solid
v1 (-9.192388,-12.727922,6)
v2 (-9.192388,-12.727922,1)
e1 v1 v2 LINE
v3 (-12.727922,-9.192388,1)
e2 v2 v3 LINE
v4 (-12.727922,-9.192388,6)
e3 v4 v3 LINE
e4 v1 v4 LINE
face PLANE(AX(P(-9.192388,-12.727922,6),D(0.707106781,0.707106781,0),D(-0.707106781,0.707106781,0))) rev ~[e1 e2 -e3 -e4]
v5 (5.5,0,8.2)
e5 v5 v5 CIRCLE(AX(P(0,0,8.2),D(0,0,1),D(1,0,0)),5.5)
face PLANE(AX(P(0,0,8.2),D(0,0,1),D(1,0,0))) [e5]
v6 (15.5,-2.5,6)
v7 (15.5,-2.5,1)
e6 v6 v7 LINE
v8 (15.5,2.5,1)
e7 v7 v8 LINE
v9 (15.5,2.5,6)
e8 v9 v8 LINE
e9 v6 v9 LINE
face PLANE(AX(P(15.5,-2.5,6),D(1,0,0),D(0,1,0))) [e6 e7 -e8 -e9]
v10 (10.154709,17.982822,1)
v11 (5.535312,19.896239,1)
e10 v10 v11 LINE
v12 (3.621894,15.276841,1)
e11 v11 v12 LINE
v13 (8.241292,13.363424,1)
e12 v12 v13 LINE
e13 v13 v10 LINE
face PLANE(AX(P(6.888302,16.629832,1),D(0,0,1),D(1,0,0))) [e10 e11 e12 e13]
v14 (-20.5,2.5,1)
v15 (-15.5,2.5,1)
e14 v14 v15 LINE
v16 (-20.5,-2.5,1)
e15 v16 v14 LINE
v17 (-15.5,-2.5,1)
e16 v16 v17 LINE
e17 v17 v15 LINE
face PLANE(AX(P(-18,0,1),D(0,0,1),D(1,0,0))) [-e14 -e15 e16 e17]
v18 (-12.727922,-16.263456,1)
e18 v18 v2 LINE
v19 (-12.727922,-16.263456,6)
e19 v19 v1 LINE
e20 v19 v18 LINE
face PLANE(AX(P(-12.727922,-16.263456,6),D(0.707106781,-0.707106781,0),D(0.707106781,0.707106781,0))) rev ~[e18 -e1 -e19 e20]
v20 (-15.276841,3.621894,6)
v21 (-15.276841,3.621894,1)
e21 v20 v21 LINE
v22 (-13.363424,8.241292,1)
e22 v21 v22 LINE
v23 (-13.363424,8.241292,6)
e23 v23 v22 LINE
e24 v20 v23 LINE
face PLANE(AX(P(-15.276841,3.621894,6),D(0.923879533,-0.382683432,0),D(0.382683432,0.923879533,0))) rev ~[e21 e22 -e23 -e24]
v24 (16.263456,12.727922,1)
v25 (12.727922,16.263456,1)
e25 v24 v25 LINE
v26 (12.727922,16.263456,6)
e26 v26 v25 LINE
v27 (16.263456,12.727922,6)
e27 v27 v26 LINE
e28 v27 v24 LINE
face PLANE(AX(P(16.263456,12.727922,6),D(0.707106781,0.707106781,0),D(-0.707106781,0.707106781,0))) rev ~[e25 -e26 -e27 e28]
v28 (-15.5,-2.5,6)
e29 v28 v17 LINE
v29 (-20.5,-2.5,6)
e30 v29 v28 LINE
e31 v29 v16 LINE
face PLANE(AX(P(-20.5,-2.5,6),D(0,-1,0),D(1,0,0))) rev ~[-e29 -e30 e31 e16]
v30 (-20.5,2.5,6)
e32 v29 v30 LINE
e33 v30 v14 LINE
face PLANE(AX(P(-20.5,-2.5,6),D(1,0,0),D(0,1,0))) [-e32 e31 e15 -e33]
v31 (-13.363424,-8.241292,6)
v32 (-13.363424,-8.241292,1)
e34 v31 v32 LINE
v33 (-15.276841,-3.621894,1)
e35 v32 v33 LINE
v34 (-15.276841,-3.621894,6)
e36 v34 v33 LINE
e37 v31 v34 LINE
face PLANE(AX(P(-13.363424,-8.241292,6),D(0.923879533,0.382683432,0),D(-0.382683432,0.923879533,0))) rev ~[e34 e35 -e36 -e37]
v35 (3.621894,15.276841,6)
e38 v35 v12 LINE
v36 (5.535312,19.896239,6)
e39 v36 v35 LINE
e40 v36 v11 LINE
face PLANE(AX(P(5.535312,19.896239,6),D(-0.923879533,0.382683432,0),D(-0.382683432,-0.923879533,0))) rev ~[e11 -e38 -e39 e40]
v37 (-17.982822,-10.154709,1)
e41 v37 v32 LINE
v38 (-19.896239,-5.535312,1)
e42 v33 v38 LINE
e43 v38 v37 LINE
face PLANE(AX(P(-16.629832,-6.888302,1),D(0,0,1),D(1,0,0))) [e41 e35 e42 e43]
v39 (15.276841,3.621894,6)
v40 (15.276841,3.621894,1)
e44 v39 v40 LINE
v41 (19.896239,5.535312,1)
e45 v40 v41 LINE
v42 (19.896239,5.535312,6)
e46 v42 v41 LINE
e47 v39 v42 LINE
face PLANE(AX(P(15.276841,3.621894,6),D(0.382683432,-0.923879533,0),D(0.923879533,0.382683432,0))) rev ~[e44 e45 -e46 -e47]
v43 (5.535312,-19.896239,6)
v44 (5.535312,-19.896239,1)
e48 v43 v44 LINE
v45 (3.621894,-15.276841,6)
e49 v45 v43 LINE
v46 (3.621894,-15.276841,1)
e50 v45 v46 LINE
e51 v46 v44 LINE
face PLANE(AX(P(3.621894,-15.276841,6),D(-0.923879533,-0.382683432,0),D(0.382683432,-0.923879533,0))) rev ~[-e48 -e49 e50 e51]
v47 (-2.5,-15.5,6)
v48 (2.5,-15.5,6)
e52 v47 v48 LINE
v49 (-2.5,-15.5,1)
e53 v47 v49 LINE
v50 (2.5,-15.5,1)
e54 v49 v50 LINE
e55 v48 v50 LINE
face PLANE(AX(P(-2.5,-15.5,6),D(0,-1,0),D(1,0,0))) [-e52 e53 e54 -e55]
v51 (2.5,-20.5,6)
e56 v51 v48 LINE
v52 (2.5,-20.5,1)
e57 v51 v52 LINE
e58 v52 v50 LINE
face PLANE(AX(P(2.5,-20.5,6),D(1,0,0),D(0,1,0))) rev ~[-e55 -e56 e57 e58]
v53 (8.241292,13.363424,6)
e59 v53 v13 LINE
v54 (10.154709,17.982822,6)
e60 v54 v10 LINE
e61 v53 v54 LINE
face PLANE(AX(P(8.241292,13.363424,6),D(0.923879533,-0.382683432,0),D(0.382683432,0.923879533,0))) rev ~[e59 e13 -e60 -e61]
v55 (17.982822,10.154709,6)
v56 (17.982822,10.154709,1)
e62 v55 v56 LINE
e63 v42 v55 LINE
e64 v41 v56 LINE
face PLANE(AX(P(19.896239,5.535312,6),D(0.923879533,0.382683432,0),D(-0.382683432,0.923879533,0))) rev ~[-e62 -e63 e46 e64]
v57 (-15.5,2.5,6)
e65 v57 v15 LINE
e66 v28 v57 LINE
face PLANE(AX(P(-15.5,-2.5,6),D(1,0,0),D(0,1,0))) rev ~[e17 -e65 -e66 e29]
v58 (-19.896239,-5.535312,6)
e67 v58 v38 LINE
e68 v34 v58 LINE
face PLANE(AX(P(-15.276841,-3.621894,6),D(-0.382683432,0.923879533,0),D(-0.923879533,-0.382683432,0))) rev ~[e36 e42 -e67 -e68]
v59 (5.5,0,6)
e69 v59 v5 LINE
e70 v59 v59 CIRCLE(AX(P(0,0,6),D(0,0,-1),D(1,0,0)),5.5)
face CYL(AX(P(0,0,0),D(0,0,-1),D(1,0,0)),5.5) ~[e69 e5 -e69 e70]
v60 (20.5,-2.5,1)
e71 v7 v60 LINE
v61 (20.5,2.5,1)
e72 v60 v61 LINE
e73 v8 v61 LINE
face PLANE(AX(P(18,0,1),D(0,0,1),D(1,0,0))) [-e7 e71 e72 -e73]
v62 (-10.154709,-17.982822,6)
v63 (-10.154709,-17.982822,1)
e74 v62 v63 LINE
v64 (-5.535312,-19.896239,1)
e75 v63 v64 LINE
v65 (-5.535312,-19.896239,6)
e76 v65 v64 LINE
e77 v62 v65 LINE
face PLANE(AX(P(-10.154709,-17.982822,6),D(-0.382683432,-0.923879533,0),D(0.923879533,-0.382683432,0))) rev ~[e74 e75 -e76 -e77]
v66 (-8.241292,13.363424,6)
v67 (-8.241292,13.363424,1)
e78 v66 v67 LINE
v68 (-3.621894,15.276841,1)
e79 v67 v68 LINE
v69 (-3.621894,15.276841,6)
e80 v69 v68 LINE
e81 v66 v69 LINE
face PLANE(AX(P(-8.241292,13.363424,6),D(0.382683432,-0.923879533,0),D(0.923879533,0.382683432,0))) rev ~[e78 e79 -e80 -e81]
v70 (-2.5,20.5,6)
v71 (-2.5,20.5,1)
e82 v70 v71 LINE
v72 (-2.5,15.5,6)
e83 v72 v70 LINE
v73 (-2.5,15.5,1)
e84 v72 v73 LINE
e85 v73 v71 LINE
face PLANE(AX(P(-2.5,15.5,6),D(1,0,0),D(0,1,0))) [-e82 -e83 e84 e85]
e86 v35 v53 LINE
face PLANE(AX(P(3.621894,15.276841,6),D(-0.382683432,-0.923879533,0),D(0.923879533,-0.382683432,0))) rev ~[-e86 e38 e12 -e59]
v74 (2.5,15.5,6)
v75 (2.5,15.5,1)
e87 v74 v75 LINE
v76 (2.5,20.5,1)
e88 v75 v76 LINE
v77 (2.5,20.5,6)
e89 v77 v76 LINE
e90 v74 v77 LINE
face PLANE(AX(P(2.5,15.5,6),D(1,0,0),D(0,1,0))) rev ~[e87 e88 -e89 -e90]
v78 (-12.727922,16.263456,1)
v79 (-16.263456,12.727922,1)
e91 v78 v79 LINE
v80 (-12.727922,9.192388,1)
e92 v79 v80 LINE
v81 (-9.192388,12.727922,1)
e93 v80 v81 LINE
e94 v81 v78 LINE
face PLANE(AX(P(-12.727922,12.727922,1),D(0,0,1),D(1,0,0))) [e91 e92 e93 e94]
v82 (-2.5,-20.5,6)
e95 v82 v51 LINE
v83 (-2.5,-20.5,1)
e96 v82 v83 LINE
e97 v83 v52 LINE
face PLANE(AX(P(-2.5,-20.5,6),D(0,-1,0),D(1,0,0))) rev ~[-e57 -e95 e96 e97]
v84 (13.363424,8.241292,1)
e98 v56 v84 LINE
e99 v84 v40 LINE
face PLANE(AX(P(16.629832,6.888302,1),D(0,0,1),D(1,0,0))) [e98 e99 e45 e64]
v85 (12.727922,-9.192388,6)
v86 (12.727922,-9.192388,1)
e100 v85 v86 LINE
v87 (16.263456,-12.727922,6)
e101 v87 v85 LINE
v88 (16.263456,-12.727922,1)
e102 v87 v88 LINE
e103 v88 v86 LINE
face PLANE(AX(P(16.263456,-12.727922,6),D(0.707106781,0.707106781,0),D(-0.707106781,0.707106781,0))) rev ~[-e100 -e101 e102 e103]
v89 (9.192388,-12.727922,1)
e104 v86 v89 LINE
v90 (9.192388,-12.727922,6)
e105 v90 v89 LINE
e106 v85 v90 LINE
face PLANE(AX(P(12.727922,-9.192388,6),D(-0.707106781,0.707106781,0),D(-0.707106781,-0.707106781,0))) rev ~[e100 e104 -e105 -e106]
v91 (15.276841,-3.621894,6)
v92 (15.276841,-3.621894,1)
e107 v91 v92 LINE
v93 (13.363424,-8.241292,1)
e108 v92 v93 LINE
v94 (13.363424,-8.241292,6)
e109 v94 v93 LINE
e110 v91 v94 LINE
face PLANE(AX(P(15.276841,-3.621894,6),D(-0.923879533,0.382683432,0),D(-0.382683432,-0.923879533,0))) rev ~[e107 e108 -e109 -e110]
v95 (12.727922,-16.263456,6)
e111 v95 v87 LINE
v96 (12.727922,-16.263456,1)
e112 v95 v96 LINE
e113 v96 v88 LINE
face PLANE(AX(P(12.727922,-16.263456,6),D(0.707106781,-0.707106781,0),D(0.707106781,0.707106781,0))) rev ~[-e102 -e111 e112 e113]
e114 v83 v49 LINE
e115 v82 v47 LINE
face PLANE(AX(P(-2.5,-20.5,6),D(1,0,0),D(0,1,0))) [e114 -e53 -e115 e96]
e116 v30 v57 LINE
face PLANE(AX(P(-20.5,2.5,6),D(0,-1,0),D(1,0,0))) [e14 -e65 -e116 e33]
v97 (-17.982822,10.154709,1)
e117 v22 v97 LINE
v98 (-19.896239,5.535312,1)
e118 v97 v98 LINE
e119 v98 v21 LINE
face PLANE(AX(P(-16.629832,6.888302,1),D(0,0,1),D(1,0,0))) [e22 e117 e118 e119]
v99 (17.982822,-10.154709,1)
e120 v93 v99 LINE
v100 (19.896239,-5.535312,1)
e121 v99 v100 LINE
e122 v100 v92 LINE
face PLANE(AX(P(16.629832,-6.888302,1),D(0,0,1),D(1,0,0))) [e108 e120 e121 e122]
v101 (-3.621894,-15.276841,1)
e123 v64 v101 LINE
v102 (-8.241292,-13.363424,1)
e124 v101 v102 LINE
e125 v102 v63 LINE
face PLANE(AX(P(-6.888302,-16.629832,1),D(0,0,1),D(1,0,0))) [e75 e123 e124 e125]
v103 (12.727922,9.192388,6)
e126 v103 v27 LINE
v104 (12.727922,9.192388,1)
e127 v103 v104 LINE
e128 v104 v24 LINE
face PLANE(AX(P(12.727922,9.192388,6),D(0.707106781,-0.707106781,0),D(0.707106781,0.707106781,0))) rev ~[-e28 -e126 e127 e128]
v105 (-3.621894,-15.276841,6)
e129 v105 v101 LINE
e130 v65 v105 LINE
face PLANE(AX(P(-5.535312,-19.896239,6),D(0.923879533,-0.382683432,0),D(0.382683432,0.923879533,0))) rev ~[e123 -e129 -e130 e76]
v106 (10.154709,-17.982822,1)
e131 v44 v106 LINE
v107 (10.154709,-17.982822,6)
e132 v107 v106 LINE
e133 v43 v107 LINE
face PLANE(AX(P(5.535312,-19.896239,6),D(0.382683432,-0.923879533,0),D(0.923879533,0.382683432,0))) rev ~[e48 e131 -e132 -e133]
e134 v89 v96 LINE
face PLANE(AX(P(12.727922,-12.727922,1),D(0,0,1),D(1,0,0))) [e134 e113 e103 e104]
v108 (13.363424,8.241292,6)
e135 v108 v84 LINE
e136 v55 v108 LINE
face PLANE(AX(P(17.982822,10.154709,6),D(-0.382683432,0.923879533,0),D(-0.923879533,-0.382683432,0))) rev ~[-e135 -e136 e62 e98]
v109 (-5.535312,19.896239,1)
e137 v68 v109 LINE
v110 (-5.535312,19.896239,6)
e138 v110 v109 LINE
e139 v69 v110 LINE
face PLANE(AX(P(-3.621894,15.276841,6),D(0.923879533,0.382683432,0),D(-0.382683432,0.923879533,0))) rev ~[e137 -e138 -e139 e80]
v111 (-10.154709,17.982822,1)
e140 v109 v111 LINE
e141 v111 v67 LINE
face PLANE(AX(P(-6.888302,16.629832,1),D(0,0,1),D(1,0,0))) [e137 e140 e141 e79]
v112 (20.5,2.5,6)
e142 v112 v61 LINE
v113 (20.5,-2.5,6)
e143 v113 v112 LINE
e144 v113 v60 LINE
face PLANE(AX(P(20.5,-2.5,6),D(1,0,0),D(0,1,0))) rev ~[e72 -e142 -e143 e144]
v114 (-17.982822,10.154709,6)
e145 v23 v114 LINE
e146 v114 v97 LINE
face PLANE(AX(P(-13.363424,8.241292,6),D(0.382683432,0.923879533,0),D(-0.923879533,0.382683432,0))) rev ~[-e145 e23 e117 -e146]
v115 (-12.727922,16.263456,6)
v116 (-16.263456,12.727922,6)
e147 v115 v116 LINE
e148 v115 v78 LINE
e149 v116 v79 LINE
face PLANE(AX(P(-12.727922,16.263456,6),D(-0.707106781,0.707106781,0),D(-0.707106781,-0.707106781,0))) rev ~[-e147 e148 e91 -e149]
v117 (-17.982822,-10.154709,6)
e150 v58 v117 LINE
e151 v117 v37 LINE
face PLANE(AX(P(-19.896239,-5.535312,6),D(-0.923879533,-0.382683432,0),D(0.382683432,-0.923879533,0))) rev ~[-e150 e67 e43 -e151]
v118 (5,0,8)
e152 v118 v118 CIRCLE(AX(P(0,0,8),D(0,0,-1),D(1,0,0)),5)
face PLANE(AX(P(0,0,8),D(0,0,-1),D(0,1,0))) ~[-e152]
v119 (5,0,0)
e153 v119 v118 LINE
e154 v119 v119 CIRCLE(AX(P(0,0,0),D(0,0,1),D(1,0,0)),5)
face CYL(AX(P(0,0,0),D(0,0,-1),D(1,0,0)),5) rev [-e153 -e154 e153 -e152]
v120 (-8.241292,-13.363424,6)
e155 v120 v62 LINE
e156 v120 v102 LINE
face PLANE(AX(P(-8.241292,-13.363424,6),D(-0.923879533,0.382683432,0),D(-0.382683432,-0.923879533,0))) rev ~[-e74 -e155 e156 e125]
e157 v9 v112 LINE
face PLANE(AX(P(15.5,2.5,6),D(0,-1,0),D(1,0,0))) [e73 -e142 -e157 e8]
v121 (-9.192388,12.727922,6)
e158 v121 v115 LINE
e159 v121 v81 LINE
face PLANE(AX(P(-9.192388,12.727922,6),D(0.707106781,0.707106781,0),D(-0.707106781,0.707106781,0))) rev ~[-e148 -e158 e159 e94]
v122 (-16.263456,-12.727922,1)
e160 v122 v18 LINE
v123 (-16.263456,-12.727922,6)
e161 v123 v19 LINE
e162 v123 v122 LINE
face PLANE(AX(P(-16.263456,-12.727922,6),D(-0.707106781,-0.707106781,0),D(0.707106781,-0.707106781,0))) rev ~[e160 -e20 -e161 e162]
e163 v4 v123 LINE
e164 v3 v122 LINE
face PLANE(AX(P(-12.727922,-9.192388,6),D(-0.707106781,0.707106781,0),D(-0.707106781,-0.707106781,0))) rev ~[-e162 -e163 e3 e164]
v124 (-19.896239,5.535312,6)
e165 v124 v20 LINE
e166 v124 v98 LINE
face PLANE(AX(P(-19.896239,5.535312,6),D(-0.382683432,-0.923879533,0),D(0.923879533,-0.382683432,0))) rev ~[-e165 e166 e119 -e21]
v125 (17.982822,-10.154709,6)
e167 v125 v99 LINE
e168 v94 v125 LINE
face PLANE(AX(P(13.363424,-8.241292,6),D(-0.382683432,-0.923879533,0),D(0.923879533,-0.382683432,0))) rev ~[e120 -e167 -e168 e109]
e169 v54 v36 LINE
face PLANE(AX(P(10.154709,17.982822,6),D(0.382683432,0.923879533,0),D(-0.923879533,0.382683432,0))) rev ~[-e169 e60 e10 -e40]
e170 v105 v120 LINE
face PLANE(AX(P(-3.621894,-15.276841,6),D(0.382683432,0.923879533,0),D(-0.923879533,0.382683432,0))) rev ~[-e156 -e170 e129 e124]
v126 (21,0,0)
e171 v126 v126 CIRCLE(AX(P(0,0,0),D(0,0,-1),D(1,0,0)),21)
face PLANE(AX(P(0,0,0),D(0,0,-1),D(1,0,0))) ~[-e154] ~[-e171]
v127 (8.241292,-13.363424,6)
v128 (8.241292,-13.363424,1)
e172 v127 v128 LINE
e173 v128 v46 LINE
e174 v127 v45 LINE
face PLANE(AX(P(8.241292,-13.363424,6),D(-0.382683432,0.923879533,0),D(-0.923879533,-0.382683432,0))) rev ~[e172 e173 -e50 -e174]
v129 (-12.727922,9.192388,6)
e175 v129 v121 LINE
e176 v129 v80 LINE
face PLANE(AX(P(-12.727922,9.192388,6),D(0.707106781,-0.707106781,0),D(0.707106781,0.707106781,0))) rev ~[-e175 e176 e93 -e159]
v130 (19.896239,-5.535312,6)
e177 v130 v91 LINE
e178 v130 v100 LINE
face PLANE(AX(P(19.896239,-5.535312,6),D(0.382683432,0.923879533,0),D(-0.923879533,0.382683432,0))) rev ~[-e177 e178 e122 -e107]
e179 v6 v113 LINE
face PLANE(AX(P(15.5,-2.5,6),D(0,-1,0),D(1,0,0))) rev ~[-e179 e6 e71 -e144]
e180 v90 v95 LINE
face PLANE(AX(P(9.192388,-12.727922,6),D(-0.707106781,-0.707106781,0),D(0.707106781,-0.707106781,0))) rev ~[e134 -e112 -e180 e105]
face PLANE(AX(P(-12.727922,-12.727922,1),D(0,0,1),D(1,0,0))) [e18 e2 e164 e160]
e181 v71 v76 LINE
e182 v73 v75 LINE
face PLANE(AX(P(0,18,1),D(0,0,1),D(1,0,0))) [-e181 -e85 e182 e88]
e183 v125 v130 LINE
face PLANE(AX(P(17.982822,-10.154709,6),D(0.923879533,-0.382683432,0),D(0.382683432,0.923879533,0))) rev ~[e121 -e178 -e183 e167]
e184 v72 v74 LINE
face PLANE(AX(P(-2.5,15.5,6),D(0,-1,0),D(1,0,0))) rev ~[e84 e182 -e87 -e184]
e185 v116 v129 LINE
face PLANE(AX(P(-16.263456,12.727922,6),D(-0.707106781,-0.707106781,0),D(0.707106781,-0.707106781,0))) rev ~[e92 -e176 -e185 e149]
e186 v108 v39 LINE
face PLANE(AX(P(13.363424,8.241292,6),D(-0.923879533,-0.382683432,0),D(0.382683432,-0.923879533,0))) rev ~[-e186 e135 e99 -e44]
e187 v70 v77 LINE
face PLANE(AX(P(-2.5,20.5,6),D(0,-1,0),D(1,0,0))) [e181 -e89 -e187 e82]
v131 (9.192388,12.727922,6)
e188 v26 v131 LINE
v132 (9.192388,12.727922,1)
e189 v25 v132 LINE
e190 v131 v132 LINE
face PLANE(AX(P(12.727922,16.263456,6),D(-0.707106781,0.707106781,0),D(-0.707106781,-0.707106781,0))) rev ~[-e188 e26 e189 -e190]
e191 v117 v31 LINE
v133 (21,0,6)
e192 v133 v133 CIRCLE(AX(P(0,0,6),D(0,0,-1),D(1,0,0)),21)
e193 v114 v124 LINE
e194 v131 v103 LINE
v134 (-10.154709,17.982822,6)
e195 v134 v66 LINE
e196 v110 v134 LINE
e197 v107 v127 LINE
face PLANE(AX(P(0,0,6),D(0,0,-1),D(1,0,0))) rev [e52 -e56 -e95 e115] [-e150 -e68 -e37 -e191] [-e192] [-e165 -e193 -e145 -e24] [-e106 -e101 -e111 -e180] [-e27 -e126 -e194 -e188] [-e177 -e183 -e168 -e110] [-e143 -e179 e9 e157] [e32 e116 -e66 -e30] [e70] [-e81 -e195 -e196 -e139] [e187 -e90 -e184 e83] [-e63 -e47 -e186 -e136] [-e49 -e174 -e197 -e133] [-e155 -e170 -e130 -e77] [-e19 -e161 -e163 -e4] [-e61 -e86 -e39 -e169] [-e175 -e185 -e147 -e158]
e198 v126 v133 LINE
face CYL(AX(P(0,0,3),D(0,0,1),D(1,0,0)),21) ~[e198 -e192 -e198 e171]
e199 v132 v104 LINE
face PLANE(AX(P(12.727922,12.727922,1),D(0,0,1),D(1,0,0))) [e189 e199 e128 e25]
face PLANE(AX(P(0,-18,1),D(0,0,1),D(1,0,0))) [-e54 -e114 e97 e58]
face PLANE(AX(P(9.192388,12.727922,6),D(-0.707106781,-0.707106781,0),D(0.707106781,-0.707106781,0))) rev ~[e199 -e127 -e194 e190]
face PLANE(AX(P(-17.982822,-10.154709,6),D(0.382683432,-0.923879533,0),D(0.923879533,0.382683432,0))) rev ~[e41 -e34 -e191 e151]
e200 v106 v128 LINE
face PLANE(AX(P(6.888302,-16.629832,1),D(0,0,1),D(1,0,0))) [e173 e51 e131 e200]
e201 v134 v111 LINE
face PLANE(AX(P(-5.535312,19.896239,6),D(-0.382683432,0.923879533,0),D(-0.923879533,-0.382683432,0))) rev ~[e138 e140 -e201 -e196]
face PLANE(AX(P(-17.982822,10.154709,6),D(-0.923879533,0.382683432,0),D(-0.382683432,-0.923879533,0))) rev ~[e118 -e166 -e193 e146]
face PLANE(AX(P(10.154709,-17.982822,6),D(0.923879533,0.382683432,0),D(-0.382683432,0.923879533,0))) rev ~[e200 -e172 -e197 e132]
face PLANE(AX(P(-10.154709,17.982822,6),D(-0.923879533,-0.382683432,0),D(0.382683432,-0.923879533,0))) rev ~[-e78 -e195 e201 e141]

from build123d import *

# Parameters (mm, degrees)
F0_W     = 21
F0_H     = 6
F2_R     = 5
F3_DEPTH = 25
F4_W     = 5
F4_H     = 5
F5_DEPTH = 5
F2_R_2   = 5.5
F6_DEPTH = 8.2


# Not quite as in the source:
# - a feature names something its author has since deleted; it is built from what else it names


with BuildPart() as f1:
    # F0 (on Front) → F1 (revolve)
    with BuildSketch(Plane.XZ):
        with Locations((10.5, 3)):
            Rectangle(F0_W, F0_H)
    revolve(axis=Axis((0, 0, 3), (0, 0, -1)))

    # F2 (on Top) → F3 (cut)
    with BuildSketch(Plane.XY):
        Circle(F2_R)
    extrude(amount=F3_DEPTH, mode=Mode.SUBTRACT)

    # F4 (on face) → F5 (cut)
    with BuildSketch(Plane.XY.offset(6)):
        with Locations((0, 18)):
            Rectangle(F4_W, F4_H)
        Polygon((5.5353115322, 19.8962389974), (3.6218943704, 15.2768413348), (8.2412920329, 13.363424173), (10.1547091948, 17.9828218356), align=None)
        Polygon((12.7279220614, 16.2634559673), (9.1923881554, 12.7279220614), (12.7279220614, 9.1923881554), (16.2634559673, 12.7279220614), align=None)
        Polygon((17.9828218356, 10.1547091948), (13.363424173, 8.2412920329), (15.2768413348, 3.6218943704), (19.8962389974, 5.5353115322), align=None)
        with Locations((18, 0)):
            Rectangle(F4_W, F4_H)
        Polygon((19.8962389974, -5.5353115322), (15.2768413348, -3.6218943704), (13.363424173, -8.2412920329), (17.9828218356, -10.1547091948), align=None)
        Polygon((16.2634559673, -12.7279220614), (12.7279220614, -9.1923881554), (9.1923881554, -12.7279220614), (12.7279220614, -16.2634559673), align=None)
        Polygon((10.1547091948, -17.9828218356), (8.2412920329, -13.363424173), (3.6218943704, -15.2768413348), (5.5353115322, -19.8962389974), align=None)
        with Locations((0, -18)):
            Rectangle(F4_W, F4_H)
        Polygon((-5.5353115322, -19.8962389974), (-3.6218943704, -15.2768413348), (-8.2412920329, -13.363424173), (-10.1547091948, -17.9828218356), align=None)
        Polygon((-12.7279220614, -16.2634559673), (-9.1923881554, -12.7279220614), (-12.7279220614, -9.1923881554), (-16.2634559673, -12.7279220614), align=None)
        Polygon((-17.9828218356, -10.1547091948), (-13.363424173, -8.2412920329), (-15.2768413348, -3.6218943704), (-19.8962389974, -5.5353115322), align=None)
        with Locations((-18, 0)):
            Rectangle(F4_W, F4_H)
        Polygon((-19.8962389974, 5.5353115322), (-15.2768413348, 3.6218943704), (-13.363424173, 8.2412920329), (-17.9828218356, 10.1547091948), align=None)
        Polygon((-16.2634559673, 12.7279220614), (-12.7279220614, 9.1923881554), (-9.1923881554, 12.7279220614), (-12.7279220614, 16.2634559673), align=None)
        Polygon((-10.1547091948, 17.9828218356), (-8.2412920329, 13.363424173), (-3.6218943704, 15.2768413348), (-5.5353115322, 19.8962389974), align=None)
    extrude(amount=-F5_DEPTH, mode=Mode.SUBTRACT)

    # F2 (on Top) → F6 (join)
    with BuildSketch(Plane.XY):
        Circle(F2_R_2)
        Circle(F2_R, mode=Mode.SUBTRACT)
    extrude(amount=F6_DEPTH)

    # F7 (on Right) → F8 (revolve)
    with BuildSketch(Plane.YZ):
        Polygon((0, 8.2), (0, 8), (5.5, 8), (5.5, 8.2), (5.4786731489, 8.2), align=None)
    revolve(axis=Axis((0, 0, 8.1), (0, 0, -1)))


solid = f1.part
